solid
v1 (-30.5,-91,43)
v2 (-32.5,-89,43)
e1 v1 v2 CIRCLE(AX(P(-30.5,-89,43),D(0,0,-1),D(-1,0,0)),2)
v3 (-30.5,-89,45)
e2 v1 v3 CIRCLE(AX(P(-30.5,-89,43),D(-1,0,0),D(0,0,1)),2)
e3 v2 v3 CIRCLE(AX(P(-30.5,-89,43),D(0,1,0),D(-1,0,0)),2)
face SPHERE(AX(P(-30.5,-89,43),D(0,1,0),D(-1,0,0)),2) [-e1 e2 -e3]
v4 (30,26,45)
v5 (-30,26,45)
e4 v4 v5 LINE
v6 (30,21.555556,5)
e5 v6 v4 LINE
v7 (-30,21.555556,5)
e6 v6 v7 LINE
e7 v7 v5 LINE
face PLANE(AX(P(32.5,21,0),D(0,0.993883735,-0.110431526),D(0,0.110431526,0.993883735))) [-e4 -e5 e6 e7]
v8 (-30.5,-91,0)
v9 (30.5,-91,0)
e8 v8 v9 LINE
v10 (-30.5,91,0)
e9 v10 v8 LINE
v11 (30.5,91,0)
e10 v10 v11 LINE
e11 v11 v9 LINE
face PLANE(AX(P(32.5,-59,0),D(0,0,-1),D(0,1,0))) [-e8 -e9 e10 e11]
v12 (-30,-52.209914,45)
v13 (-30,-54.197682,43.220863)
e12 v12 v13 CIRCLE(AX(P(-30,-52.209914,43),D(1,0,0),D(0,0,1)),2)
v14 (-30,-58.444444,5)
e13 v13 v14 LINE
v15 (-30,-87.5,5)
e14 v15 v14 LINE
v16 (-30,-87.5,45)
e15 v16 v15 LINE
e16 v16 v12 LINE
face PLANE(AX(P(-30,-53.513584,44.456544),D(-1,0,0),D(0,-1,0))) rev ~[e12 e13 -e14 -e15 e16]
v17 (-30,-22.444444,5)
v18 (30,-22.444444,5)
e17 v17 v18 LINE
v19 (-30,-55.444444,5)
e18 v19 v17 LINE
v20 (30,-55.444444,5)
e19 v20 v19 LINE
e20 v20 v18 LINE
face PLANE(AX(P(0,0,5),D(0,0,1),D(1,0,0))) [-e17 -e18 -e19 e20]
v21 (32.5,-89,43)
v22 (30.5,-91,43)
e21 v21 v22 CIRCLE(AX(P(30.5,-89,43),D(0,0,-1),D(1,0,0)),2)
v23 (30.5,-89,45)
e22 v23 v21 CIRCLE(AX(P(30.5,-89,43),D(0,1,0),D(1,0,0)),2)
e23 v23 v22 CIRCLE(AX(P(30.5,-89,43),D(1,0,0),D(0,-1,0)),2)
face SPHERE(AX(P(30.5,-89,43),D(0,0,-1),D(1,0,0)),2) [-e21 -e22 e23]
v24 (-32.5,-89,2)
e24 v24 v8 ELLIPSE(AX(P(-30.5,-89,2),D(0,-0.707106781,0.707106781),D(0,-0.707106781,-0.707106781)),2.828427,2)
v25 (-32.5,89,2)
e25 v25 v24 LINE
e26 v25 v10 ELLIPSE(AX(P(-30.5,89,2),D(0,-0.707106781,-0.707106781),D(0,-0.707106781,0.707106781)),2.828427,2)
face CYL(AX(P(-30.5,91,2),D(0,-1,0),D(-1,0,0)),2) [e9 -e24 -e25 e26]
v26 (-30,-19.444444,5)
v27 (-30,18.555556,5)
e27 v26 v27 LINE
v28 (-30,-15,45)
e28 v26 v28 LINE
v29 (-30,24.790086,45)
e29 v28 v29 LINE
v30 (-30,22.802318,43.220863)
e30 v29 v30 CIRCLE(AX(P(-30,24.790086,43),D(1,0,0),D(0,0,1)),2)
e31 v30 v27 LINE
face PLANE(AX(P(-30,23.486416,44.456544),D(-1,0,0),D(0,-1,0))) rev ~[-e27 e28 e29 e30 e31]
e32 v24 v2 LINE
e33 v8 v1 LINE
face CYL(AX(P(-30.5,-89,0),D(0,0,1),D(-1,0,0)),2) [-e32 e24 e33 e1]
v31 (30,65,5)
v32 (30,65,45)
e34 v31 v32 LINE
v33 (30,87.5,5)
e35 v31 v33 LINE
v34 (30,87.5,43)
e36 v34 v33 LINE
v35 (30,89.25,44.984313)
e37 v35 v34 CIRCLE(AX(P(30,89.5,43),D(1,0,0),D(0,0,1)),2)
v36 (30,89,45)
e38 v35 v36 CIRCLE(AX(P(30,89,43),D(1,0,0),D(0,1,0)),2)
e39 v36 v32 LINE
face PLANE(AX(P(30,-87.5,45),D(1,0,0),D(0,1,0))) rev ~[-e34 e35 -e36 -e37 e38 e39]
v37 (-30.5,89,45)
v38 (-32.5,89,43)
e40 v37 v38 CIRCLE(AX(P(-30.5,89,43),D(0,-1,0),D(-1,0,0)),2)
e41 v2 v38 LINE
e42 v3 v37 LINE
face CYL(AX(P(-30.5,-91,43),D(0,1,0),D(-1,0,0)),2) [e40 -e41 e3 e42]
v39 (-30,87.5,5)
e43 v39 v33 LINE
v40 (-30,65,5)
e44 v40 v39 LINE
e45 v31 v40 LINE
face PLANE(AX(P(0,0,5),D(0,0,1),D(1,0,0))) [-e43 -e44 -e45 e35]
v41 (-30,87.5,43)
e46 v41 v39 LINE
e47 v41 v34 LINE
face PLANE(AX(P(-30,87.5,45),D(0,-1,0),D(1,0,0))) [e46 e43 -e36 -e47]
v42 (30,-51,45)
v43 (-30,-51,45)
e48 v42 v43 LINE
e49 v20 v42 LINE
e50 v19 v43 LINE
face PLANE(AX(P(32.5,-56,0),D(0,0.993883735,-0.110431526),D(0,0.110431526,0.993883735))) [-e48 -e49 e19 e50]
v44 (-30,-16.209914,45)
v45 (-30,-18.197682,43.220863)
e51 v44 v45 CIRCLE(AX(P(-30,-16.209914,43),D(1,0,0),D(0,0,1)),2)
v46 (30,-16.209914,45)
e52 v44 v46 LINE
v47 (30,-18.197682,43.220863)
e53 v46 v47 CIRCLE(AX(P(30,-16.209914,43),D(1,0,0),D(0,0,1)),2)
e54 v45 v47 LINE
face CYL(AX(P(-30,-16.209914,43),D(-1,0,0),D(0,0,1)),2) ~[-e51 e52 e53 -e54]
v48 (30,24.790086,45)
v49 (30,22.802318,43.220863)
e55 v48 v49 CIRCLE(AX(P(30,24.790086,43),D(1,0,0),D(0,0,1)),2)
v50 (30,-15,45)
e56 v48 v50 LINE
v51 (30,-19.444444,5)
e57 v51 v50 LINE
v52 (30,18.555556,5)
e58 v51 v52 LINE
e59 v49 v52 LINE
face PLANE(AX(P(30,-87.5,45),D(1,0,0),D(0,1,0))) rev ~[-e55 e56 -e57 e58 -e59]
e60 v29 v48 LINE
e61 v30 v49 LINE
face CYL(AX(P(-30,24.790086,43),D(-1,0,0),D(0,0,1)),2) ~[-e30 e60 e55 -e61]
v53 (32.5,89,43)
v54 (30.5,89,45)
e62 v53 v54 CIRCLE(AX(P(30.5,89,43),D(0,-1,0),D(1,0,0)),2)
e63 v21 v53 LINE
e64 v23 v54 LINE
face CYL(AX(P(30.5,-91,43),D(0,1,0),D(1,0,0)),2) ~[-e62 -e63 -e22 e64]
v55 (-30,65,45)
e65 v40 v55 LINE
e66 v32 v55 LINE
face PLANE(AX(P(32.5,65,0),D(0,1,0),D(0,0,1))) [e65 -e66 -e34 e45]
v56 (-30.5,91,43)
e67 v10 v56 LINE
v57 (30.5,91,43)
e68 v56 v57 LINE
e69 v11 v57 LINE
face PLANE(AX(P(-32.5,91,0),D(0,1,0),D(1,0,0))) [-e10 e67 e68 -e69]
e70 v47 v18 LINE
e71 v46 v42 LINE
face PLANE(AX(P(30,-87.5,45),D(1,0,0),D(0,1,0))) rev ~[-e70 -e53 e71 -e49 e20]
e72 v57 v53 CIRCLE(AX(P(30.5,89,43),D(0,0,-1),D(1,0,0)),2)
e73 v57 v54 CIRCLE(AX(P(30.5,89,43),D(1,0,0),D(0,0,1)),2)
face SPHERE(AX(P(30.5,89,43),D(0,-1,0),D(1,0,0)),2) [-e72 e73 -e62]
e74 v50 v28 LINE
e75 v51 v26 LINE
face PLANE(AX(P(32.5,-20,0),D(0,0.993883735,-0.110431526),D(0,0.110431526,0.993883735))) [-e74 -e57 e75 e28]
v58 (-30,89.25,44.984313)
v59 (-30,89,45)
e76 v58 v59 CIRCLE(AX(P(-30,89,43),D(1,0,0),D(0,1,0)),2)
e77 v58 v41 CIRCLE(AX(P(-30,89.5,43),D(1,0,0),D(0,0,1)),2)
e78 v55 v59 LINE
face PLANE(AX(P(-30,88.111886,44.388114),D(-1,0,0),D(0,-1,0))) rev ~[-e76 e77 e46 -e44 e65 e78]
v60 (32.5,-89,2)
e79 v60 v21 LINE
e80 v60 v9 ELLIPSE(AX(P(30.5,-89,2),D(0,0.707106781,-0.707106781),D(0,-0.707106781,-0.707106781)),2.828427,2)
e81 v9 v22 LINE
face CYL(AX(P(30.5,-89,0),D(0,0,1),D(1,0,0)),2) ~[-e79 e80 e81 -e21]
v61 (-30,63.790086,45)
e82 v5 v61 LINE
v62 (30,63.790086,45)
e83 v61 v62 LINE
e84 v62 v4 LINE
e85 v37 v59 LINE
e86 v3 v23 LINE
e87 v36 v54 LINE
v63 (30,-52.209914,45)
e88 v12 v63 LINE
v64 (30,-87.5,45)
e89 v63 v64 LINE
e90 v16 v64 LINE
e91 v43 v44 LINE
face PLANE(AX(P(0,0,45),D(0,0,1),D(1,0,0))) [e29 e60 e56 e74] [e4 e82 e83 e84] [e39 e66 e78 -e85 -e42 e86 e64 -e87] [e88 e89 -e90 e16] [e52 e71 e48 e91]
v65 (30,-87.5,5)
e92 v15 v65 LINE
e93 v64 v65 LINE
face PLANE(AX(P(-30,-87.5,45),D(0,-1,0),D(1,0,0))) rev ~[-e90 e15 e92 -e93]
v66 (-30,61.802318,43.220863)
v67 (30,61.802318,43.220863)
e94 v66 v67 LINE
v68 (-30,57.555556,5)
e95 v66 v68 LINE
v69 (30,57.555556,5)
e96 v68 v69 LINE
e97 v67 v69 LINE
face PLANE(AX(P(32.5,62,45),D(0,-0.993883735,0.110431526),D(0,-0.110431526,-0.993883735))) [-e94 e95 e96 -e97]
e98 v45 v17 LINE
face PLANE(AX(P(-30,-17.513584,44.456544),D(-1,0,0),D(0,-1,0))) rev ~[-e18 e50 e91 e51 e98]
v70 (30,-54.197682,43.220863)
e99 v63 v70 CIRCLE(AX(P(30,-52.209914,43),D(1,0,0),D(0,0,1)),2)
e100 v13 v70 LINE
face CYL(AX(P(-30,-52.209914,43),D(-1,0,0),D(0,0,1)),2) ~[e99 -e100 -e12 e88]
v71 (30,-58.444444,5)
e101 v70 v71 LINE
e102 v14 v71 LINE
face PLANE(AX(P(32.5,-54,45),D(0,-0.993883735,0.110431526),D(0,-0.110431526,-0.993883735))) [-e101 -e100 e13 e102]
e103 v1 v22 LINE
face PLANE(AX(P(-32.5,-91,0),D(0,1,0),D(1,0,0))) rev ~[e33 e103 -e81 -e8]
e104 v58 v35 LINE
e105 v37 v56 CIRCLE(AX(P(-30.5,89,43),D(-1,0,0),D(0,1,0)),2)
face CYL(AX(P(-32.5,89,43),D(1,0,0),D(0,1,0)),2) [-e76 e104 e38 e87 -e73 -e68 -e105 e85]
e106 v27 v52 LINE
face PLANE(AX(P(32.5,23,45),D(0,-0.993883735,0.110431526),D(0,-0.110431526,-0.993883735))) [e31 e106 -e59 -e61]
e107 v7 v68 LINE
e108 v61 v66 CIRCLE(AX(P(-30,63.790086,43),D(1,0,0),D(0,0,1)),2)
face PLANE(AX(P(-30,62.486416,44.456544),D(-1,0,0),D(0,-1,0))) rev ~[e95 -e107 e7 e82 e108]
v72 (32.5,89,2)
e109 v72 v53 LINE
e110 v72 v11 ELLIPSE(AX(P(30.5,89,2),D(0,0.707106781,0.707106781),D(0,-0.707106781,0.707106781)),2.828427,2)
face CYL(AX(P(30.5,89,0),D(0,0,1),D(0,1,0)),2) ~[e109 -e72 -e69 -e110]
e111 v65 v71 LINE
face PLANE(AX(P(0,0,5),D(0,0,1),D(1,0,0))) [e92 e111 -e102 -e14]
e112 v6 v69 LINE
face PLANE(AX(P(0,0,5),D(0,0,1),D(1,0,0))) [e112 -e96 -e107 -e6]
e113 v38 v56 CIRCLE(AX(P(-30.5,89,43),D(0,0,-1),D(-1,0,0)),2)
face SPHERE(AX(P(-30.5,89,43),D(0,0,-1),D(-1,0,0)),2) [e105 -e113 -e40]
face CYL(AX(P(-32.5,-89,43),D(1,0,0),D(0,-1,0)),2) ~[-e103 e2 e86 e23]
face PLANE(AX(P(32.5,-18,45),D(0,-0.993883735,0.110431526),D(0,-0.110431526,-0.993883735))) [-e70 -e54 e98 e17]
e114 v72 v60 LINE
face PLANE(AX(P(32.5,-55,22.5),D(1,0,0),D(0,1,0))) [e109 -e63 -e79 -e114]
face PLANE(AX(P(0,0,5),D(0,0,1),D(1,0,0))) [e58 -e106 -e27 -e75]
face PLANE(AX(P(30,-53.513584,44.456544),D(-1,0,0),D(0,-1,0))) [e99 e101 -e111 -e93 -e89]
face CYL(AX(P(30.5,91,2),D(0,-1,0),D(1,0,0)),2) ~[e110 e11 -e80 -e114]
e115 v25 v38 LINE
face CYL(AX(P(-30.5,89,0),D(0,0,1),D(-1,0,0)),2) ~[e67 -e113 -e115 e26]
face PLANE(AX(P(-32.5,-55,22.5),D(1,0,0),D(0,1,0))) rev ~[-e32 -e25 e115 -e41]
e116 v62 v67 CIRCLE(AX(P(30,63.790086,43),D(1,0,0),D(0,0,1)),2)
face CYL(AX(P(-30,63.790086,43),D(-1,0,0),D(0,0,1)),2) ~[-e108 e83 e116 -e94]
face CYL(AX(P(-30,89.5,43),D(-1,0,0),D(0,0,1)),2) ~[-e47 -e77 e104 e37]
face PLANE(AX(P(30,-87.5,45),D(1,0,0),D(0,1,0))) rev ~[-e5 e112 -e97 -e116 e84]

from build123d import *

# Parameters (mm, degrees)
F0_W        = 65
F0_H        = 182
F1_DEPTH    = 45
F2_W        = 60
F2_H        = 175
F3_DEPTH    = 40
F5_DEPTH    = 65
F6_R        = 2
F7_T1_DEPTH = 60


# Not quite as in the source:
# - a fillet or chamfer that OpenCascade refuses, or shapes differently, is made with other operations: its cross-section is extruded or revolved along the edge and cut away or added


with BuildPart() as f1:
    # F0 (on Top) → F1 (new body)
    with BuildSketch(Plane.XY):
        Rectangle(F0_W, F0_H)
    extrude(amount=F1_DEPTH)

    # F2 (on face) → F3 (cut)
    with BuildSketch(Plane.XY.offset(45)):
        Rectangle(F2_W, F2_H)
    extrude(amount=-F3_DEPTH, mode=Mode.SUBTRACT)

    # F4 (on face) → F5 (join)
    with BuildSketch(Plane.YZ.offset(32.5)):
        Polygon((-51, 45), (-54, 45), (-59, 0), (-56, 0), align=None)
        Polygon((-15, 45), (-18, 45), (-23, 0), (-20, 0), align=None)
        Polygon((26, 45), (23, 45), (18, 0), (21, 0), align=None)
        Polygon((65, 45), (62, 45), (57, 0), (65, 0), align=None)
    extrude(amount=-F5_DEPTH)

    # F6
    f6_edges = [f1.edges().sort_by_distance(p)[0] for p in [
        (-32.5, 0, 0),
        (-32.5, 91, 22.5),
        (-32.5, 0, 45),
        (-32.5, -91, 22.5),
        (32.5, 0, 0),
        (32.5, -91, 22.5),
        (32.5, 0, 45),
        (32.5, 91, 22.5),
        (0, -91, 45),
        (0, 91, 45),
    ]]
    fillet(f6_edges, radius=F6_R)

    # F7: fillet of radius 2 on 5 edges, made by hand

    # F7_s2 → F7_t1 (cut)
    with BuildSketch(Plane.YZ.offset(-30)):
        with BuildLine():
            ThreePointArc((-52.2099144137, 45), (-53.5437573385, 44.4902560358), (-54.1976818831, 43.2208630521))
            Line((-54.1976818831, 43.2208630521), (-54, 45))
            Line((-54, 45), (-52.2099144137, 45))
        make_face()
        with BuildLine():
            ThreePointArc((-16.2099144137, 45), (-17.5437573385, 44.4902560358), (-18.1976818831, 43.2208630521))
            Line((-18.1976818831, 43.2208630521), (-18, 45))
            Line((-18, 45), (-16.2099144137, 45))
        make_face()
        with BuildLine():
            ThreePointArc((24.7900855863, 45), (23.4562426615, 44.4902560358), (22.8023181169, 43.2208630521))
            Line((22.8023181169, 43.2208630521), (23, 45))
            Line((23, 45), (24.7900855863, 45))
        make_face()
        with BuildLine():
            ThreePointArc((63.7900855863, 45), (62.4562426615, 44.4902560358), (61.8023181169, 43.2208630521))
            Line((61.8023181169, 43.2208630521), (62, 45))
            Line((62, 45), (63.7900855863, 45))
        make_face()
        with BuildLine():
            ThreePointArc((89.5, 45), (88.0857864376, 44.4142135624), (87.5, 43))
            Line((87.5, 43), (87.5, 45))
            Line((87.5, 45), (89.5, 45))
        make_face()
    extrude(amount=F7_T1_DEPTH, mode=Mode.SUBTRACT)


solid = f1.part
